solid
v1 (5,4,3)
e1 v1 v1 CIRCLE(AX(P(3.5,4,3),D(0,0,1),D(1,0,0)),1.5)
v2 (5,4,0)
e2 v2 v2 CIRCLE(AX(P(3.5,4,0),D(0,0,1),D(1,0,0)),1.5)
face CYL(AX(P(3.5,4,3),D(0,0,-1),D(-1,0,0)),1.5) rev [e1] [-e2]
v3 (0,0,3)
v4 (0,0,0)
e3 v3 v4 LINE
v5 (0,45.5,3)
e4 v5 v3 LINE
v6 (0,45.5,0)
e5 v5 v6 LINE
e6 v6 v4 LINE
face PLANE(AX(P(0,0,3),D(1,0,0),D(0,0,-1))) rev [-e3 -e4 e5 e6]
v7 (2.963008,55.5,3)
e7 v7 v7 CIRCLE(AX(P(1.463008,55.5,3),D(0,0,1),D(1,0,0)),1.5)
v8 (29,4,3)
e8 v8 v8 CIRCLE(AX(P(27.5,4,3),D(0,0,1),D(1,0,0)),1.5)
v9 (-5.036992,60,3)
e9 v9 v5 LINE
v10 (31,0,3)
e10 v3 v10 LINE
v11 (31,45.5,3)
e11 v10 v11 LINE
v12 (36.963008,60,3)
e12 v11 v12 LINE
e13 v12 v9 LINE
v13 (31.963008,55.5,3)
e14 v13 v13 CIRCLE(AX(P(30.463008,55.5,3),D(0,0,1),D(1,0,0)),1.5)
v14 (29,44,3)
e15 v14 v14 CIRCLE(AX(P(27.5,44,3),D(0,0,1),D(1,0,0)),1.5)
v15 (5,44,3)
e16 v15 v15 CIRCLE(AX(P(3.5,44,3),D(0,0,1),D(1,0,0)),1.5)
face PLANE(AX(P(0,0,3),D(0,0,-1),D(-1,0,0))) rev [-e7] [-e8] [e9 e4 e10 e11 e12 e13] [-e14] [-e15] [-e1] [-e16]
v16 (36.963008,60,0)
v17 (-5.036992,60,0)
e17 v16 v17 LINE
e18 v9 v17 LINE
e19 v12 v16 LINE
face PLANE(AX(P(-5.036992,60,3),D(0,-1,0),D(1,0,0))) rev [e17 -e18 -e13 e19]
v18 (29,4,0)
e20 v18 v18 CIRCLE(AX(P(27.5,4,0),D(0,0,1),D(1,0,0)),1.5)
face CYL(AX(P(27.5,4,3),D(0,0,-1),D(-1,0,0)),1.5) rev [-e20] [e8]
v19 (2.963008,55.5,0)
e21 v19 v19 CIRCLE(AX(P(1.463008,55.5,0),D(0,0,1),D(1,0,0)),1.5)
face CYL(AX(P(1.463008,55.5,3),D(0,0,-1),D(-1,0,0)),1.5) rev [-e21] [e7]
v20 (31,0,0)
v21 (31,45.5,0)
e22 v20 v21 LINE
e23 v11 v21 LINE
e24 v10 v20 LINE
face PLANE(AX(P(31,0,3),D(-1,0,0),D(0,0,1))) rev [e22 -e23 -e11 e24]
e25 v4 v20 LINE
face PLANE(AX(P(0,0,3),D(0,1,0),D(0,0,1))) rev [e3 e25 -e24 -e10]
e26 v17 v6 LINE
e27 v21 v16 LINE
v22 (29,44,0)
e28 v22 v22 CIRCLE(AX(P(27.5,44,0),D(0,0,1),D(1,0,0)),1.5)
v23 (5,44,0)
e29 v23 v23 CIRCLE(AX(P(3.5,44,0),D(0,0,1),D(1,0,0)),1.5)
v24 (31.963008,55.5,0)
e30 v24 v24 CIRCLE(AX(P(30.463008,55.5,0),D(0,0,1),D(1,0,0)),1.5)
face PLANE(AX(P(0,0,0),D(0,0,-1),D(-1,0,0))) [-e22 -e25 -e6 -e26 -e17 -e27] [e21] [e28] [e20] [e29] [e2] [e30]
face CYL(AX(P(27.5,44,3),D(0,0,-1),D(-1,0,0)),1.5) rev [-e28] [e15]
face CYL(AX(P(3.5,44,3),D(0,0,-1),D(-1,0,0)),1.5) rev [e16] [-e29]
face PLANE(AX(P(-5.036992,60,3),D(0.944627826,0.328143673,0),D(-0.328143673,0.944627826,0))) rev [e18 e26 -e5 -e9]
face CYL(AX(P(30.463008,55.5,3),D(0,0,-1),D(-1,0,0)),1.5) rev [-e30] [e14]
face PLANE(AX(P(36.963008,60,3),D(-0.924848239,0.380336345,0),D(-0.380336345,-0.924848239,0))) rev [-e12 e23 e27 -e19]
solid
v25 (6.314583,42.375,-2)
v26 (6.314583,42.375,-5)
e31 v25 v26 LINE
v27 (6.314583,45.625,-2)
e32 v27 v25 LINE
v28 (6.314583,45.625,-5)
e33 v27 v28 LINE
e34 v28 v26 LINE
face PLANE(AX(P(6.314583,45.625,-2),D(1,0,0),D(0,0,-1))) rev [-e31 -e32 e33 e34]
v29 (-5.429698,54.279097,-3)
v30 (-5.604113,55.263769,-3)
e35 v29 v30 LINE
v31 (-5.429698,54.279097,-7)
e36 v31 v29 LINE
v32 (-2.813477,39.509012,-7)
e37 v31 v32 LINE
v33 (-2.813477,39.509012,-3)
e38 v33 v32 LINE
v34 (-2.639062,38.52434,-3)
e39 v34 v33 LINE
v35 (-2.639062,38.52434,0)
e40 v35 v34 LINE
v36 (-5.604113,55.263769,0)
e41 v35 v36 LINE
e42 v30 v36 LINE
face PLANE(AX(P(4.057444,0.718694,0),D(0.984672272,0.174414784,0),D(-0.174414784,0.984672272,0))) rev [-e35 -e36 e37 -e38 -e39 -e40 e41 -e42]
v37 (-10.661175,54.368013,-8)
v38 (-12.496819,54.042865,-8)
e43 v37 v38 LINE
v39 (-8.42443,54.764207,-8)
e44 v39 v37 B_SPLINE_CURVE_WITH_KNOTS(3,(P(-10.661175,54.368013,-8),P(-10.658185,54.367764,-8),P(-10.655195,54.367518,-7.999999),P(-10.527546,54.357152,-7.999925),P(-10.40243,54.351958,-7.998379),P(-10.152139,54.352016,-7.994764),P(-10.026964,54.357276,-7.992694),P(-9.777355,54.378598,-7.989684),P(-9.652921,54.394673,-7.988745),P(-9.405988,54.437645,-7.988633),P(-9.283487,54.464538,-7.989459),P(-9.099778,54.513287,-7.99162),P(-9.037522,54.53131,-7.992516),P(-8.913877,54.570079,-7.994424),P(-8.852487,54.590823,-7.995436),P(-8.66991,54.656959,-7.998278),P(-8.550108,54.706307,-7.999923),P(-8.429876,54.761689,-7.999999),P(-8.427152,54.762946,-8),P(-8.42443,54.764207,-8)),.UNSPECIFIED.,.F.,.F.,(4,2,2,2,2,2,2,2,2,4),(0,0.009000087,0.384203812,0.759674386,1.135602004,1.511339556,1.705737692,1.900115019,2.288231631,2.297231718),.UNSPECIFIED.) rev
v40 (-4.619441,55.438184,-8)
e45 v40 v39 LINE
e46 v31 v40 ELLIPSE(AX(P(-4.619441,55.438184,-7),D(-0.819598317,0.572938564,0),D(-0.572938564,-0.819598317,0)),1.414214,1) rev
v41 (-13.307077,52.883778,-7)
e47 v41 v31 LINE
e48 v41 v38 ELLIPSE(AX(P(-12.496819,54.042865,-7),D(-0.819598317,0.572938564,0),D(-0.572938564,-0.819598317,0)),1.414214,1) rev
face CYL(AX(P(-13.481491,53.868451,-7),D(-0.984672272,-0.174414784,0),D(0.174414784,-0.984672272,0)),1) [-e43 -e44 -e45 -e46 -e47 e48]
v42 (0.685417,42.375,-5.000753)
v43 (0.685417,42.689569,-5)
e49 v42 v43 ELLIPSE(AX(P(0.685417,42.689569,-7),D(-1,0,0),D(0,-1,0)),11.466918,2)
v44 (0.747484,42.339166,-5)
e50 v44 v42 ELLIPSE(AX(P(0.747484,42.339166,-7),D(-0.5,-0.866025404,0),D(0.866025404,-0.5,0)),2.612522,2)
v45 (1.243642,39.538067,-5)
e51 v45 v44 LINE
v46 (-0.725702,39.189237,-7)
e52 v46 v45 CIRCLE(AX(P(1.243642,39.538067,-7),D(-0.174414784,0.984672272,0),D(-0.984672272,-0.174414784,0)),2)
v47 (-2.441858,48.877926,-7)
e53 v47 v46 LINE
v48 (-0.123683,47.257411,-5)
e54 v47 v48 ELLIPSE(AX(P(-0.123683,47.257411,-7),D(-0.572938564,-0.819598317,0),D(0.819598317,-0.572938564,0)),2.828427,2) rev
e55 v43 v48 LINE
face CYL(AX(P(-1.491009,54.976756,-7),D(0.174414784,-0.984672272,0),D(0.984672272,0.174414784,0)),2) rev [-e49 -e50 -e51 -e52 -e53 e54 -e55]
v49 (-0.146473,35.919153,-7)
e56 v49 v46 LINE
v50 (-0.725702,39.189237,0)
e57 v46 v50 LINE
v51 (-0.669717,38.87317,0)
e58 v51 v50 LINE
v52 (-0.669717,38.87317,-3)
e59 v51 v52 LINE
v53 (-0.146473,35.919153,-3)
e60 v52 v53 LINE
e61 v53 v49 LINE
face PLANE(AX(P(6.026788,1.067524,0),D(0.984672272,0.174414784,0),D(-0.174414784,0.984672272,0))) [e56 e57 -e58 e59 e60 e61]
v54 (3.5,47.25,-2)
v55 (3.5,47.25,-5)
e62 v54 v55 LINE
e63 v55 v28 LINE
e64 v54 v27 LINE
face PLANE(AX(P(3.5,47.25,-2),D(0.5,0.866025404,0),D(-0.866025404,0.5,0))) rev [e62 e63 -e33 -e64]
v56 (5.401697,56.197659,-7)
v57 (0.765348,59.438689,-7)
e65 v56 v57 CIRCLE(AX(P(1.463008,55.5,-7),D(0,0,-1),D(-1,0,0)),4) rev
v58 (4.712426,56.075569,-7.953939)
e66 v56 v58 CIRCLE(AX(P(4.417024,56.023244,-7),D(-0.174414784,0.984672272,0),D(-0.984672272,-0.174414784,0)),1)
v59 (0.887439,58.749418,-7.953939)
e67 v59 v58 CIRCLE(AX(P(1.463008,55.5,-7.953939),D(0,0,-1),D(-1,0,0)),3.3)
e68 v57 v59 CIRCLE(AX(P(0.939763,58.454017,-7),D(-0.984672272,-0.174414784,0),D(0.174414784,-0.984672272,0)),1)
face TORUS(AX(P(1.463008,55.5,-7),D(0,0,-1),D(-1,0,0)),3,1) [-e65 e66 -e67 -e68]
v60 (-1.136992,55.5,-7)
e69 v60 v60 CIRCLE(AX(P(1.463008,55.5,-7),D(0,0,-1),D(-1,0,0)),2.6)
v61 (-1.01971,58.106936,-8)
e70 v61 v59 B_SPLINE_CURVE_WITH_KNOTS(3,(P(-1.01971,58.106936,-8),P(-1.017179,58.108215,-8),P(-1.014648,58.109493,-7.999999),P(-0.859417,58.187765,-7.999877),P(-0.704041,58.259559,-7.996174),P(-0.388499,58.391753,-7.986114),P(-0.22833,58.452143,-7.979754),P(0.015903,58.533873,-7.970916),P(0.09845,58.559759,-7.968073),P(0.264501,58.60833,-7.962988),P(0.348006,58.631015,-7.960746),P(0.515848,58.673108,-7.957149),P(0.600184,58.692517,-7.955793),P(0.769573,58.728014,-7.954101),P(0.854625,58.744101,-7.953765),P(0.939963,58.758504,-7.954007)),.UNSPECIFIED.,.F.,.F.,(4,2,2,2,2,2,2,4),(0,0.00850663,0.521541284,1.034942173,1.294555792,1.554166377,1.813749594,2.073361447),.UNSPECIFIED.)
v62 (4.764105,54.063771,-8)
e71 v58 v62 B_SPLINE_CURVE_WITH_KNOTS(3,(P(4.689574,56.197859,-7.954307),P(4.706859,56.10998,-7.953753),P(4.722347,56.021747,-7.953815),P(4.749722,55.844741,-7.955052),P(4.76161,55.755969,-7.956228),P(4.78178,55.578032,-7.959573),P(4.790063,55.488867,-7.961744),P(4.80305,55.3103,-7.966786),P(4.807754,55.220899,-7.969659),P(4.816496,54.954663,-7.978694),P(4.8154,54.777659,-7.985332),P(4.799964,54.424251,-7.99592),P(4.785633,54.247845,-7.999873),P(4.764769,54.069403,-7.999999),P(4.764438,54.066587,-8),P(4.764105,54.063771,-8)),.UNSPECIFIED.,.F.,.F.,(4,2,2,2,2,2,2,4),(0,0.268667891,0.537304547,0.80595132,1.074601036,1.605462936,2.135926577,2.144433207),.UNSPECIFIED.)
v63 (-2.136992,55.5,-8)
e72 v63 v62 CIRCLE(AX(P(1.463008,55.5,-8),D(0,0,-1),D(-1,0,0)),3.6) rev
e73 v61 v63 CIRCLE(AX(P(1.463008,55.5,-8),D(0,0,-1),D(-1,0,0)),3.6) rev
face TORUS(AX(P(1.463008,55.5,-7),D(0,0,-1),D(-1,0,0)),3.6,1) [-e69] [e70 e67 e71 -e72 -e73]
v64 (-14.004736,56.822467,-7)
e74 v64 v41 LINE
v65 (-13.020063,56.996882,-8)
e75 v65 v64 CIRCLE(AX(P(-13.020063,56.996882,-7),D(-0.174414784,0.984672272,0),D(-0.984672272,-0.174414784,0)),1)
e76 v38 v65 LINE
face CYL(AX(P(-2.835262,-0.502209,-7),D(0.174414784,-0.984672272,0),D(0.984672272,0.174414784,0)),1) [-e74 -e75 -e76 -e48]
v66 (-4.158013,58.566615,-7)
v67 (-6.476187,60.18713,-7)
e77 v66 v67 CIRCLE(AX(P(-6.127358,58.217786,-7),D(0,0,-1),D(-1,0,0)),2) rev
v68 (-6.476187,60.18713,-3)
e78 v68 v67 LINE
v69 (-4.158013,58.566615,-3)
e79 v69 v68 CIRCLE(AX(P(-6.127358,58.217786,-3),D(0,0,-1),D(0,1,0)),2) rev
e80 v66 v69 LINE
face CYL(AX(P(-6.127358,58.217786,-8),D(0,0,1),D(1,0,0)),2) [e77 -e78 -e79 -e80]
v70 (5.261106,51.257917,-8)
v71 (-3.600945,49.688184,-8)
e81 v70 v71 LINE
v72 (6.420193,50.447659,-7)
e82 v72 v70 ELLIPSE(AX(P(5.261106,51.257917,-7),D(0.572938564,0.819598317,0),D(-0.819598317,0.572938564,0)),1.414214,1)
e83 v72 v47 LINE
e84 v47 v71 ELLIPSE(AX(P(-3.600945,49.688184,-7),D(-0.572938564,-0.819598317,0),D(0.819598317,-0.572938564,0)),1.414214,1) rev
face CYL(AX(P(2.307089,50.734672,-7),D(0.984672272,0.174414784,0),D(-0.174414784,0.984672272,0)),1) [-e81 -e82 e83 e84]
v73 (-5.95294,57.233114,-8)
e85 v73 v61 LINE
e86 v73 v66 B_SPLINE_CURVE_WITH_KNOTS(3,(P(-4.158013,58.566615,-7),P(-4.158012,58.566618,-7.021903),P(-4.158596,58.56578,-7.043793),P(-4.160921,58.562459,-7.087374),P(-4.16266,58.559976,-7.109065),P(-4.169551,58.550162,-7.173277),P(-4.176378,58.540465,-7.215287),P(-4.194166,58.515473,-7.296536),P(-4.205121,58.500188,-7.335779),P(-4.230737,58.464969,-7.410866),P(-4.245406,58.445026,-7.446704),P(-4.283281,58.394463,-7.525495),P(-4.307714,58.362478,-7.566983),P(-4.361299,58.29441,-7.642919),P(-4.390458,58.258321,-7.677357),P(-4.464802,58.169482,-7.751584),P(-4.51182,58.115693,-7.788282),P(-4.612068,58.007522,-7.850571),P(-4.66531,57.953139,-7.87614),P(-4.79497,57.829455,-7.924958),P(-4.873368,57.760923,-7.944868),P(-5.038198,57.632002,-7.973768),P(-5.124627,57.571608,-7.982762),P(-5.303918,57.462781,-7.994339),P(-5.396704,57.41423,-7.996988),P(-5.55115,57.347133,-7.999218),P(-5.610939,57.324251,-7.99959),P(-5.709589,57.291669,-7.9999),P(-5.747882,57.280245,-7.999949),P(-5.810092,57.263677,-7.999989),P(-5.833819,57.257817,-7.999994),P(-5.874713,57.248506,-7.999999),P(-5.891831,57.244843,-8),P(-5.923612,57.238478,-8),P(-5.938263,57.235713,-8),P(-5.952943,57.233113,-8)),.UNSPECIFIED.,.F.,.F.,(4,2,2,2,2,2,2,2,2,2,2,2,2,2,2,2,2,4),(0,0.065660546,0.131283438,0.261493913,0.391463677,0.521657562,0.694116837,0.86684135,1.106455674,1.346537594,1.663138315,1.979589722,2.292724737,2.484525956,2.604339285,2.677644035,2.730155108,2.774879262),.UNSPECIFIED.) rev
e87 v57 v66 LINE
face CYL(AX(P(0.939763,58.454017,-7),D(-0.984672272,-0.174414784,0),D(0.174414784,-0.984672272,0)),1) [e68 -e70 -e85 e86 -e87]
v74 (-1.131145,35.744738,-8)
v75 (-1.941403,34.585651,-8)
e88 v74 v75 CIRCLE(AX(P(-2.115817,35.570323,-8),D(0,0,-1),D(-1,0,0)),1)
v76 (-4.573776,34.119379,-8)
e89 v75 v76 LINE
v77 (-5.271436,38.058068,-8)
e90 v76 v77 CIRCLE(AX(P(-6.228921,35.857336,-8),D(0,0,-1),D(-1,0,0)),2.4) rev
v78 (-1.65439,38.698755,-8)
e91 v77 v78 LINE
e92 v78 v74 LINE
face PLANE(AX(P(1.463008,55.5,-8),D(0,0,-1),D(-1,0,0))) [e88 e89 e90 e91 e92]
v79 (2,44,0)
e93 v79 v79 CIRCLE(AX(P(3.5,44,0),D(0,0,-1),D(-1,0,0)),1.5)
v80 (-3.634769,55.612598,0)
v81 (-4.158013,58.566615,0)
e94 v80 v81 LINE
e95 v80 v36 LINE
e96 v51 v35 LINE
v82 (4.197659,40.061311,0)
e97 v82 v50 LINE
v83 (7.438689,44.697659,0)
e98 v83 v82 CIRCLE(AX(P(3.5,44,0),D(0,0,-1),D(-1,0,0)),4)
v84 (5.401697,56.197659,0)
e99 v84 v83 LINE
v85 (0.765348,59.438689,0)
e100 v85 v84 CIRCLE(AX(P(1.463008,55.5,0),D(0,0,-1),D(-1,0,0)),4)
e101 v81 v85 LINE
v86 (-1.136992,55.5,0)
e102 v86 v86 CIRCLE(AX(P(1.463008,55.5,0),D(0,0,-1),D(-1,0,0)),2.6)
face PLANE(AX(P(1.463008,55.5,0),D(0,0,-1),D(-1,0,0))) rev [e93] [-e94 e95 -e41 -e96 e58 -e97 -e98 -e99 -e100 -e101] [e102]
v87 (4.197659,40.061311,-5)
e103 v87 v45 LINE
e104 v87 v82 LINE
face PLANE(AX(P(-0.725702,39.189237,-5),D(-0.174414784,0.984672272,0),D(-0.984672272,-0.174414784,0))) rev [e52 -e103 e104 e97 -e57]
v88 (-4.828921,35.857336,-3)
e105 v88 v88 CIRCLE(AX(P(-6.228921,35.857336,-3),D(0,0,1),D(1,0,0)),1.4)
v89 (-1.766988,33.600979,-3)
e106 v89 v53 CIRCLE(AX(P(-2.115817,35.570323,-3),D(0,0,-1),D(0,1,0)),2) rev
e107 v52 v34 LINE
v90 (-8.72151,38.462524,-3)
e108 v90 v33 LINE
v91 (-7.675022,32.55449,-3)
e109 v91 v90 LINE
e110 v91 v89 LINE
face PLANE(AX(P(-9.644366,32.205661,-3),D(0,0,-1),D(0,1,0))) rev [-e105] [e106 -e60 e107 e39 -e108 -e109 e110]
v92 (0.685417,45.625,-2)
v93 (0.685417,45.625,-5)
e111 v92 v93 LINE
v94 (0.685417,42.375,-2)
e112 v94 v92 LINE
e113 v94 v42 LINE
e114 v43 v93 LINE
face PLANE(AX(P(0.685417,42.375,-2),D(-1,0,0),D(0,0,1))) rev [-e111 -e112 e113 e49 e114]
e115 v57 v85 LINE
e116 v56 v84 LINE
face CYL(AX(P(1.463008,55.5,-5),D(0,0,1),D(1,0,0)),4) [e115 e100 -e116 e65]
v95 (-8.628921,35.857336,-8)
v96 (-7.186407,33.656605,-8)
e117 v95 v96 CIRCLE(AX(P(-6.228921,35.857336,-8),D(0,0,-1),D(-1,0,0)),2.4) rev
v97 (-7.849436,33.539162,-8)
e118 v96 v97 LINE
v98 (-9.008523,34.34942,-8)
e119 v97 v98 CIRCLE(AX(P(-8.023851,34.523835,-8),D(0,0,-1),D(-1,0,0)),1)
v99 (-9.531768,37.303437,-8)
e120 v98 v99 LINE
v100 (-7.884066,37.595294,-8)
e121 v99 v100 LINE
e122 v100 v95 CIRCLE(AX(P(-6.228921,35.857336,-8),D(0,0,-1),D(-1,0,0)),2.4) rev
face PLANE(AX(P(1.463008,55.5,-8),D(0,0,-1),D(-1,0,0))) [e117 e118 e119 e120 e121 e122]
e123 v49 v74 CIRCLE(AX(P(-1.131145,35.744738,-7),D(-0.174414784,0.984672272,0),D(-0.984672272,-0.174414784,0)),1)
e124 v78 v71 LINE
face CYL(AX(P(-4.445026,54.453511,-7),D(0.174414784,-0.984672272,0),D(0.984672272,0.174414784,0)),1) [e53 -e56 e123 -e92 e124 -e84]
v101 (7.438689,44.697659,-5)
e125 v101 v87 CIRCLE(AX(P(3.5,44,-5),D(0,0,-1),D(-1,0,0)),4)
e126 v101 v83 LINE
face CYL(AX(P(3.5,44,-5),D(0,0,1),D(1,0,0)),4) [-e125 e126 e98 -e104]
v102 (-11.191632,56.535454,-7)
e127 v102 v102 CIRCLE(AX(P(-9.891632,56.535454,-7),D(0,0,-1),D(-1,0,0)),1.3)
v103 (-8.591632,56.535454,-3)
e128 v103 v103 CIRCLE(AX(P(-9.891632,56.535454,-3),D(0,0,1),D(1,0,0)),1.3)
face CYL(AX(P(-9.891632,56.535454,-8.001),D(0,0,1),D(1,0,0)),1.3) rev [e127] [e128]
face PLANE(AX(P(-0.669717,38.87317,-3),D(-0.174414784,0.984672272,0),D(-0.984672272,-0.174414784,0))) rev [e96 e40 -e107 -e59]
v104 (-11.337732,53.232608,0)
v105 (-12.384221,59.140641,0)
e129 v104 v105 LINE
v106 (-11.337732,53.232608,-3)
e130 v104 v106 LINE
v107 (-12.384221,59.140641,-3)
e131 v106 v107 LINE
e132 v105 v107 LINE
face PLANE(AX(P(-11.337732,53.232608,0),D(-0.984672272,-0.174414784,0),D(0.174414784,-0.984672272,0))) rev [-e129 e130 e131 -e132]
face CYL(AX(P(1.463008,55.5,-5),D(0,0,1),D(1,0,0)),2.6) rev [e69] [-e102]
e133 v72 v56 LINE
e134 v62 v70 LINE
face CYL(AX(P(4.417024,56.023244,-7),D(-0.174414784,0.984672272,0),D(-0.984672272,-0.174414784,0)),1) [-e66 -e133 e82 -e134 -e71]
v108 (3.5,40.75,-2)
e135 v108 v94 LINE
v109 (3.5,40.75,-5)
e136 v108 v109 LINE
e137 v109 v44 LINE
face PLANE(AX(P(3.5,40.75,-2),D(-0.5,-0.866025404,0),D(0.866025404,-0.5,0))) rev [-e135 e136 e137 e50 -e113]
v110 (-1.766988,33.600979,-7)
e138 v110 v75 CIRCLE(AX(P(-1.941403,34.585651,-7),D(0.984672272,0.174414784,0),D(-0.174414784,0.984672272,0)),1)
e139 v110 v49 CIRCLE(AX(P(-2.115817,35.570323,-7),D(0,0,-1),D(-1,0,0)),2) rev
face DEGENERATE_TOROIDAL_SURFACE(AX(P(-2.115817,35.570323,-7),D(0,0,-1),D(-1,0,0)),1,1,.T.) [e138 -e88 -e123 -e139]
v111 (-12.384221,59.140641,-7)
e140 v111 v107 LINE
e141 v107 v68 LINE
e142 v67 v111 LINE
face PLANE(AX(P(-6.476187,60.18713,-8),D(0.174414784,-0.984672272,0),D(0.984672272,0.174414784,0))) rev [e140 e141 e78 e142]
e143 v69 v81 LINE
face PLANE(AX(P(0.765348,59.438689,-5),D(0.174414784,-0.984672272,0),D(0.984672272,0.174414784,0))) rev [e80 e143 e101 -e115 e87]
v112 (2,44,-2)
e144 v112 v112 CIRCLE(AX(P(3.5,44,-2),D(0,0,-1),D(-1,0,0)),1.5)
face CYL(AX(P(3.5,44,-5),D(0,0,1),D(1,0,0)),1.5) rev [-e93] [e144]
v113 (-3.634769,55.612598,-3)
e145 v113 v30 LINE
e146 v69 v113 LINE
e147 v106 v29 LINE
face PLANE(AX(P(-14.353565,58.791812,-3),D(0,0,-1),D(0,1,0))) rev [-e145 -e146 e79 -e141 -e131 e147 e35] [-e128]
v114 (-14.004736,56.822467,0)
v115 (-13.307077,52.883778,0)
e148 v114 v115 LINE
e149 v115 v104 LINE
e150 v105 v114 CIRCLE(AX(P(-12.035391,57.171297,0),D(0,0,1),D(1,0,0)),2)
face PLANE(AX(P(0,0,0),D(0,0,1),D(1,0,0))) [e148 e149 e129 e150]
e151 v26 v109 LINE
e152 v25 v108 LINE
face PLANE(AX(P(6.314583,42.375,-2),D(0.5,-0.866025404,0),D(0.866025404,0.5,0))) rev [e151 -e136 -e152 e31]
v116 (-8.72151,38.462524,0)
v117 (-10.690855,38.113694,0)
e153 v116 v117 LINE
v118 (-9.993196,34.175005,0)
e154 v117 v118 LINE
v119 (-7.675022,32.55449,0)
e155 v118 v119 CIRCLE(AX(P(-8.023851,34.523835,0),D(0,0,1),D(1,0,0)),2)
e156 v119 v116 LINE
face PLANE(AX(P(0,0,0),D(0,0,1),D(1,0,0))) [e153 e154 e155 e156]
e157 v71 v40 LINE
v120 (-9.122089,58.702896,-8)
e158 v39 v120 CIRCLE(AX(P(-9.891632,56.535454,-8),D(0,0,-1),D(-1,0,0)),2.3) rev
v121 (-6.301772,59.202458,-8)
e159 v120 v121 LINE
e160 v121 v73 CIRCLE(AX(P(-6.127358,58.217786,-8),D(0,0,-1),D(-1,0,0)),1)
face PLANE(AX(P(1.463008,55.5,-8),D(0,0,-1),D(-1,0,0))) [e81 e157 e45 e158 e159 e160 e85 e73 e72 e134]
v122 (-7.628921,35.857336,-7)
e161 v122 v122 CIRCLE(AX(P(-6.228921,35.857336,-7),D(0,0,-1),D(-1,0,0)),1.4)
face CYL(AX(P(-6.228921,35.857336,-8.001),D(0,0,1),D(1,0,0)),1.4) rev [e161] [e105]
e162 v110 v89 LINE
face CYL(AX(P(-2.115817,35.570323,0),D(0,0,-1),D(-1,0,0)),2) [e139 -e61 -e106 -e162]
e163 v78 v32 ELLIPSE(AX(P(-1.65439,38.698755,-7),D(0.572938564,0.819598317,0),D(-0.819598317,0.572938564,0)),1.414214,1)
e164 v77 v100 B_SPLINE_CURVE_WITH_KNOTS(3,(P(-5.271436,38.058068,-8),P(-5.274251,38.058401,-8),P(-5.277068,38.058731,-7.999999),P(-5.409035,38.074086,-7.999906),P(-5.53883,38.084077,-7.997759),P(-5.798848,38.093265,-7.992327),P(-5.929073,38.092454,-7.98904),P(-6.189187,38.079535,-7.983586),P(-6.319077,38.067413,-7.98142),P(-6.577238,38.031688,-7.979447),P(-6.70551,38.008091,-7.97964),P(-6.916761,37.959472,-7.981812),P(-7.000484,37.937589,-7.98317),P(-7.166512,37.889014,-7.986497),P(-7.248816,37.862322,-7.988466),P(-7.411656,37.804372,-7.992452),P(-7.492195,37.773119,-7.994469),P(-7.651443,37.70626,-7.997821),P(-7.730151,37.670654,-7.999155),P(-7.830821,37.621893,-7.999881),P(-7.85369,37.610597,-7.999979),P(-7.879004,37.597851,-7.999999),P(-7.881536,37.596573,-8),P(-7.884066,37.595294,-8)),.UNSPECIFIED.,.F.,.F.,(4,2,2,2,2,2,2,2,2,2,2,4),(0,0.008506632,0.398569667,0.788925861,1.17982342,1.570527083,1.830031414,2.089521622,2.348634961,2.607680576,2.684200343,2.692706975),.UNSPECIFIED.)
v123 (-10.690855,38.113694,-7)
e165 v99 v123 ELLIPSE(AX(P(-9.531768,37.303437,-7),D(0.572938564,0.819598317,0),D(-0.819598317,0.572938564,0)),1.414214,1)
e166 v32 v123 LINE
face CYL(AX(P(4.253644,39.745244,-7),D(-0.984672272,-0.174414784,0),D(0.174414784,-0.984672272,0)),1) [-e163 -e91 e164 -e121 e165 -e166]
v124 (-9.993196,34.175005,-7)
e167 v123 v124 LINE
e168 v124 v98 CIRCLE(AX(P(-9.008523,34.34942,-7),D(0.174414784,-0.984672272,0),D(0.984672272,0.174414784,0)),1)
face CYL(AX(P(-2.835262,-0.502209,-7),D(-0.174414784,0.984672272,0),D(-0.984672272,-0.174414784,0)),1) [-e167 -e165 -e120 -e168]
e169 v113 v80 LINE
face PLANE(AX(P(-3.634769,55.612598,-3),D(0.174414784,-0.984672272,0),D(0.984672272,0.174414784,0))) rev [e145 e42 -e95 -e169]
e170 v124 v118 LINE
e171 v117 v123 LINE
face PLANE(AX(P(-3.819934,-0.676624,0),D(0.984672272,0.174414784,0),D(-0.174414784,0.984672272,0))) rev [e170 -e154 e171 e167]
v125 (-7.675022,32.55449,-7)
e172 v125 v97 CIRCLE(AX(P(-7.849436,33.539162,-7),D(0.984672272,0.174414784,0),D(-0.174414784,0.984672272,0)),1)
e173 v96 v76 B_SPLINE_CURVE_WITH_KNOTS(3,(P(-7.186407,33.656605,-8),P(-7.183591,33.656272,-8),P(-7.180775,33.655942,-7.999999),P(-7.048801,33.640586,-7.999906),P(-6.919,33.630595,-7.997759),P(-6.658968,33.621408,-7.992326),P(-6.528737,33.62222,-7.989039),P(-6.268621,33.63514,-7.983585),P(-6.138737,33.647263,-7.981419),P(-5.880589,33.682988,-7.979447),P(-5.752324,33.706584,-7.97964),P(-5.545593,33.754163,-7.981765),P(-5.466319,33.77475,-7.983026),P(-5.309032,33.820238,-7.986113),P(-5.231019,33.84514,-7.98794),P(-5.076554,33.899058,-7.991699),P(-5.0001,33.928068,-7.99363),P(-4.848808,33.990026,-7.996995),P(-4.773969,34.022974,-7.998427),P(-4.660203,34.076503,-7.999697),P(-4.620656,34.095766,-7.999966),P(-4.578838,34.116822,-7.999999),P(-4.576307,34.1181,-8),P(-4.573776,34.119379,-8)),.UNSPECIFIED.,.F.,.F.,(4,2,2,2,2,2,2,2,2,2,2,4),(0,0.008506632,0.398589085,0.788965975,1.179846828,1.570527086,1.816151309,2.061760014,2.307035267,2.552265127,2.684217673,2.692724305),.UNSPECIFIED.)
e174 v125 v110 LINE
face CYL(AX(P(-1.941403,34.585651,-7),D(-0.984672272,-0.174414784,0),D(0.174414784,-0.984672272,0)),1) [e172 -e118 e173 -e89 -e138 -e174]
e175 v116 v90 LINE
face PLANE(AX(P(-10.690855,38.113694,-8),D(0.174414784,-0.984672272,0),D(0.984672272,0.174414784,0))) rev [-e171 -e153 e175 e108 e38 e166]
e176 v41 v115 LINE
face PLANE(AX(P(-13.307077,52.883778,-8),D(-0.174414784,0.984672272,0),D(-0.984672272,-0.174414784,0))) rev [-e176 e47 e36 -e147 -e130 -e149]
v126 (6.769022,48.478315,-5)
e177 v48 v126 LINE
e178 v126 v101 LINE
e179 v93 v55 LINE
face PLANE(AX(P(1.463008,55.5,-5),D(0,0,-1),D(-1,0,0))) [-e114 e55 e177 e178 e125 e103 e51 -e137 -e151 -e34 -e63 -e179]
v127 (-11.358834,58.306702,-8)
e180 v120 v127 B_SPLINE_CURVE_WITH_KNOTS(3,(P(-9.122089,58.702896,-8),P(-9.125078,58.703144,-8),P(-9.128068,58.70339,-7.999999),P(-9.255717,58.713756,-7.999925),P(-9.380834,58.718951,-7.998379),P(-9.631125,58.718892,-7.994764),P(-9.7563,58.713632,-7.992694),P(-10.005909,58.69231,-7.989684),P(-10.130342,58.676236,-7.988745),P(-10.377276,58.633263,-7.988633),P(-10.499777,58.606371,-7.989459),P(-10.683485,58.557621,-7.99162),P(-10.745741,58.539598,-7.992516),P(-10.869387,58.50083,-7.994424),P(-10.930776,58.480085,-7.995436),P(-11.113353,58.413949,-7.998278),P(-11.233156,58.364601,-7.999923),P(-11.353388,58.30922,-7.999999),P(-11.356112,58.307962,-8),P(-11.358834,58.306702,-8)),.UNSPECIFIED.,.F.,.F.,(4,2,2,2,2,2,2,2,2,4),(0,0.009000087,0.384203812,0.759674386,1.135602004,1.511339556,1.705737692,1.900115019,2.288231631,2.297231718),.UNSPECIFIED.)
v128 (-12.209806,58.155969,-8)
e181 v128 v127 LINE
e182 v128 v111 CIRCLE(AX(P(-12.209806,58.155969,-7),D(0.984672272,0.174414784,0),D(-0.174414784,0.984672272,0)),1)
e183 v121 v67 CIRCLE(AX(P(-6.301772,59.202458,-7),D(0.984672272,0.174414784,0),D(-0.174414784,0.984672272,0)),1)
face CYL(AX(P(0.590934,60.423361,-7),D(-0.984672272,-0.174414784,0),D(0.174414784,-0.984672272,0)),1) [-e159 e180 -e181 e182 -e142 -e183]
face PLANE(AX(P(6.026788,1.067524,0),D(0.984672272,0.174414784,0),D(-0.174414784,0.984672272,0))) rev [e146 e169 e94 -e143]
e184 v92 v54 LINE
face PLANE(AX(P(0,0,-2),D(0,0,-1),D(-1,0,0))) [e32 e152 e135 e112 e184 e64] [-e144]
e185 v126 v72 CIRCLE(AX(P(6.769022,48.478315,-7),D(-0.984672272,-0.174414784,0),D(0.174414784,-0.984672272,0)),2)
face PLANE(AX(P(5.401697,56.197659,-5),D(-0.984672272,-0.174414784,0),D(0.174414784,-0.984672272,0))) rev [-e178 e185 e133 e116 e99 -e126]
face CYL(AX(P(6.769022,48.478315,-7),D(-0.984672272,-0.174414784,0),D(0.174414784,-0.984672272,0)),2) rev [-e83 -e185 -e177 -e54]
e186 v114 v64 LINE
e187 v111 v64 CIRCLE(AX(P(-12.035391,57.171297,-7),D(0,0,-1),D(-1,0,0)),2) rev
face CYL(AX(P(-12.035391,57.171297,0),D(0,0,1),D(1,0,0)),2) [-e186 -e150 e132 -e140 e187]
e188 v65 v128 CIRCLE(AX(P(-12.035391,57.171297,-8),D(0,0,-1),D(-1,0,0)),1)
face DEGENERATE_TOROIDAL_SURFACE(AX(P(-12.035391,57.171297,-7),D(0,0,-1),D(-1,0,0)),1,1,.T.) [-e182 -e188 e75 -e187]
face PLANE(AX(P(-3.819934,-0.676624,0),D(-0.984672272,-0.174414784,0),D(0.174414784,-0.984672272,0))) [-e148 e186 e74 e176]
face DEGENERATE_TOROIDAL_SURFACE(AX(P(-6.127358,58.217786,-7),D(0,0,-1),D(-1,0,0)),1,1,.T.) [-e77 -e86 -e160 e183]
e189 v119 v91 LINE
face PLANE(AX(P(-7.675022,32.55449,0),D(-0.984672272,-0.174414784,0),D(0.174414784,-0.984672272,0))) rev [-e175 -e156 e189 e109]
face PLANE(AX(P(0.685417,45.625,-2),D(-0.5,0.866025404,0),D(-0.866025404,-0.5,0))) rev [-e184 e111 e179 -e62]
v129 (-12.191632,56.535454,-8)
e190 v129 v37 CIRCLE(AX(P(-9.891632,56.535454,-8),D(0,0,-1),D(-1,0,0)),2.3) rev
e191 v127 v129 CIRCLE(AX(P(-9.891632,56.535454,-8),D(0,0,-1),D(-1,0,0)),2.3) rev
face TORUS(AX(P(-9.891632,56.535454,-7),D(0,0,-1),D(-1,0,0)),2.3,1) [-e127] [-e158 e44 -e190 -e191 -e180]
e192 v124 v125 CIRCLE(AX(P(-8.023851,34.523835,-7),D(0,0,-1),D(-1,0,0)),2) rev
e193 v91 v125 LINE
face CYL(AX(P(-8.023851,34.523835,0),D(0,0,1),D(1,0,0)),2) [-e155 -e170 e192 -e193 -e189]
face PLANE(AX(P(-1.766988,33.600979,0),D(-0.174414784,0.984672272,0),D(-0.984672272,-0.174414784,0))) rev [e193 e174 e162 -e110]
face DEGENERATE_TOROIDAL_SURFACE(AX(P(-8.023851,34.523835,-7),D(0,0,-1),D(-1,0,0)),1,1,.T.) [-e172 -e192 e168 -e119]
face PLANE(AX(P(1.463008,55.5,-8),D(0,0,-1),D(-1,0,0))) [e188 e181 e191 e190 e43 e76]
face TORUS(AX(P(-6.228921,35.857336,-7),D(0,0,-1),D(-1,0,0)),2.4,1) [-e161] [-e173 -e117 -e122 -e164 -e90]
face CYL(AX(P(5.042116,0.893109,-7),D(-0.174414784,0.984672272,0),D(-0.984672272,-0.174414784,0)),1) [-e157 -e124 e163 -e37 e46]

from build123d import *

# Parameters (mm, degrees)
SKETCH1_R           = 1.5
BOSS_EXTRUDE1_DEPTH = 3
SKETCH3_R           = 2.6
SKETCH3_R_2         = 1.5
BOSS_EXTRUDE2_DEPTH = 5
SKETCH6_R           = 2.6
BOSS_EXTRUDE5_DEPTH = 3
CUT_EXTRUDE1_DEPTH  = 3
SKETCH4_W           = 8
SKETCH4_H           = 27
BOSS_EXTRUDE7_DEPTH = 2
SKETCH9_W           = 5
SKETCH9_H           = 6
BOSS_EXTRUDE8_DEPTH = 8
SKETCH10_W          = 3
SKETCH10_H          = 5
CUT_EXTRUDE2_DEPTH  = 2
SKETCH11_R          = 1.4
SKETCH11_R_2        = 1.3
CUT_EXTRUDE3_DEPTH  = 5
BOSS_EXTRUDE9_DEPTH = 3
FILLET1_R           = 2
FILLET2_R           = 1


with BuildPart() as part:
    # Sketch1 → Boss-Extrude1 (new body)
    with BuildSketch(Plane.XY):
        Polygon((0, 0), (31, 0), (31, 45.5), (36.963007518, 60), (-5.036992482, 60), (0, 45.5), align=None)
        with Locations((30.463007518, 55.5)):
            Circle(SKETCH1_R, mode=Mode.SUBTRACT)
        with Locations((27.5, 44)):
            Circle(SKETCH1_R, mode=Mode.SUBTRACT)
        with Locations((27.5, 4)):
            Circle(SKETCH1_R, mode=Mode.SUBTRACT)
        with Locations((3.5, 4)):
            Circle(SKETCH1_R, mode=Mode.SUBTRACT)
        with Locations((3.5, 44)):
            Circle(SKETCH1_R, mode=Mode.SUBTRACT)
        with Locations((1.463007518, 55.5)):
            Circle(SKETCH1_R, mode=Mode.SUBTRACT)
    extrude(amount=BOSS_EXTRUDE1_DEPTH)


with BuildPart() as body_2:
    # Sketch3 → Boss-Extrude2 (new body)
    with BuildSketch(Plane(origin=(0, 0, 0), x_dir=(-1, 0, 0), z_dir=(0, 0, -1))):
        with BuildLine():
            Line((-5.401696606, 56.197659136), (-7.438689088, 44.697659136))
            ThreePointArc((-7.438689088, 44.697659136), (-6.778393269, 41.708245743), (-4.197659136, 40.061310912))
            Line((-4.197659136, 40.061310912), (0.725702224, 39.189236993))
            Line((0.725702224, 39.189236993), (4.158012977, 58.566615168))
            Line((4.158012977, 58.566615168), (-0.765348382, 59.438689088))
            ThreePointArc((-0.765348382, 59.438689088), (-3.754761775, 58.778393269), (-5.401696606, 56.197659136))
        make_face()
        with Locations((-1.463007518, 55.5)):
            Circle(SKETCH3_R, mode=Mode.SUBTRACT)
        with Locations((-3.5, 44)):
            Circle(SKETCH3_R_2, mode=Mode.SUBTRACT)
    extrude(amount=BOSS_EXTRUDE2_DEPTH)

    # Sketch6 → Boss-Extrude5 (add)
    with BuildSketch(Plane(origin=(0, 0, -5), x_dir=(-1, 0, 0), z_dir=(0, 0, -1))):
        with BuildLine():
            Line((-6.420192847, 50.447659136), (2.441857601, 48.87792608))
            Line((2.441857601, 48.87792608), (4.158012977, 58.566615168))
            Line((4.158012977, 58.566615168), (-0.765348382, 59.438689088))
            ThreePointArc((-0.765348382, 59.438689088), (-3.754761775, 58.778393269), (-5.401696606, 56.197659136))
            Line((-5.401696606, 56.197659136), (-6.420192847, 50.447659136))
        make_face()
        with Locations((-1.463007518, 55.5)):
            Circle(SKETCH6_R, mode=Mode.SUBTRACT)
    extrude(amount=BOSS_EXTRUDE5_DEPTH)

    # Sketch8 → Cut-Extrude1 (cut)
    with BuildSketch(Plane(origin=(0, 0, -5), x_dir=(-1, 0, 0), z_dir=(0, 0, -1))):
        Polygon((-3.5, 40.75), (-0.685417438, 42.375), (-0.685417438, 45.625), (-3.5, 47.25), (-6.314582562, 45.625), (-6.314582562, 42.375), align=None)
    extrude(amount=-CUT_EXTRUDE1_DEPTH, mode=Mode.SUBTRACT)

    # Sketch4 → Boss-Extrude7 (add)
    with BuildSketch(Plane(origin=(6.026788499, 1.067523727, 0), x_dir=(0, 0, 1), z_dir=(-0.9846722719514623, -0.17441478392024493, 0))):
        with Locations((-4, 46.894140953)):
            Rectangle(SKETCH4_W, SKETCH4_H)
    extrude(amount=BOSS_EXTRUDE7_DEPTH)

    # Sketch9 → Boss-Extrude8 (add)
    with BuildSketch(Plane(origin=(4.057443955, 0.718694159, 0), x_dir=(0, 0, 1), z_dir=(-0.9846722719514623, -0.17441478392024487, 0))):
        with Locations((-5.5, 57.394140953)):
            Rectangle(SKETCH9_W, SKETCH9_H)
        with Locations((-5.5, 36.394140953)):
            Rectangle(SKETCH9_W, SKETCH9_H)
    extrude(amount=BOSS_EXTRUDE8_DEPTH)

    # Sketch10 → Cut-Extrude2 (cut)
    with BuildSketch(Plane(origin=(4.057443955, 0.718694159, 0), x_dir=(0, 0, 1), z_dir=(-0.9846722719514623, -0.17441478392024487, 0))):
        with Locations((-1.5, 57.894140953)):
            Rectangle(SKETCH10_W, SKETCH10_H)
        with Locations((-1.5, 35.894140953)):
            Rectangle(SKETCH10_W, SKETCH10_H)
    extrude(amount=-CUT_EXTRUDE2_DEPTH, mode=Mode.SUBTRACT)

    # Sketch11 → Cut-Extrude3 (cut)
    with BuildSketch(Plane.XY.offset(-3)):
        with Locations((-6.228921363, 35.857336482)):
            Circle(SKETCH11_R)
        with Locations((-9.891631825, 56.535454193)):
            Circle(SKETCH11_R_2)
    extrude(amount=-CUT_EXTRUDE3_DEPTH, mode=Mode.SUBTRACT)

    # Sketch12 → Boss-Extrude9 (add)
    with BuildSketch(Plane.XY.offset(-3)):
        Polygon((-10.690854802, 38.113694162), (-9.644366099, 32.20566053), (-7.675021555, 32.554490098), (-8.721510258, 38.46252373), align=None)
        Polygon((-14.353565265, 58.791811873), (-13.307076561, 52.883778241), (-11.337732017, 53.232607809), (-12.384220721, 59.140641441), align=None)
    extrude(amount=BOSS_EXTRUDE9_DEPTH)

    # Fillet1
    # the kernel refuses this fillet: 2 mm, written as the material it adds along each edge
    with BuildSketch(Plane(origin=(-0.725702224, 39.189236993, -5), x_dir=(0.9846722719514622, 0.1744147839202449, 0), z_dir=(-0.1744147839202449, 0.9846722719514622, 0))) as fillet1_piece_1_section:
        with BuildLine():
            CenterArc((FILLET1_R, FILLET1_R), FILLET1_R, 180, 90)
            Line((0, FILLET1_R), (0, 0))
            Line((0, 0), (FILLET1_R, 0))
        make_face()
    fillet1_piece_1 = extrude(amount=14.839506366, mode=Mode.PRIVATE)
    fillet1_piece_1 = split(fillet1_piece_1, bisect_by=Plane(origin=(1.750934761, 41.759823287, -5.016294478), z_dir=(-0.49999999999999994, -0.8660254037844387, 0)), keep=Keep.TOP, mode=Mode.PRIVATE)
    add(fillet1_piece_1)
    with BuildSketch(Plane(origin=(-0.725702224, 39.189236993, -5), x_dir=(0.9846722719514622, 0.1744147839202449, 0), z_dir=(-0.1744147839202449, 0.9846722719514622, 0))) as fillet1_piece_2_section:
        with BuildLine():
            CenterArc((FILLET1_R, FILLET1_R), FILLET1_R, 180, 90)
            Line((0, FILLET1_R), (0, 0))
            Line((0, 0), (FILLET1_R, 0))
        make_face()
    fillet1_piece_2 = extrude(amount=14.839506366, mode=Mode.PRIVATE)
    fillet1_piece_2 = split(fillet1_piece_2, bisect_by=Plane(origin=(0.685417438, 46.149775088, -5.43451479), z_dir=(-1, 0, 0)), keep=Keep.TOP, mode=Mode.PRIVATE)
    add(fillet1_piece_2)
    with BuildSketch(Plane(origin=(6.420192847, 50.447659136, -5), x_dir=(0.1744147839202439, -0.9846722719514623, 0), z_dir=(-0.9846722719514623, -0.17441478392024387, 0))) as fillet1_piece_3:
        with BuildLine():
            CenterArc((FILLET1_R, -FILLET1_R), FILLET1_R, 90, 90)
            Line((0, -FILLET1_R), (0, 0))
            Line((0, 0), (FILLET1_R, 0))
        make_face()
    extrude(amount=9)
    # the kernel refuses this fillet: 2 mm, written as the material it takes off along each edge
    with BuildSketch(Plane(origin=(-4.506842545, 60.535959712, -13), x_dir=(0.17441478392024556, -0.9846722719514621, 0), z_dir=(0, 0, 1))) as fillet1_2_piece_1:
        with BuildLine():
            CenterArc((FILLET1_R, -FILLET1_R), FILLET1_R, 90, 90)
            Line((0, -FILLET1_R), (0, 0))
            Line((0, 0), (FILLET1_R, 0))
        make_face()
    extrude(amount=15, mode=Mode.SUBTRACT)
    with BuildSketch(Plane(origin=(0.202356621, 33.949808369, 2), x_dir=(-0.9846722719514622, -0.17441478392024462, 0), z_dir=(0, 0, -1))) as fillet1_2_piece_2:
        with BuildLine():
            CenterArc((FILLET1_R, FILLET1_R), FILLET1_R, 180, 90)
            Line((0, FILLET1_R), (0, 0))
            Line((0, 0), (FILLET1_R, 0))
        make_face()
    extrude(amount=15, mode=Mode.SUBTRACT)
    with BuildSketch(Plane(origin=(-14.353565265, 58.791811873, -13), x_dir=(0.9846722719514622, 0.17441478392024498, 0), z_dir=(0, 0, 1))) as fillet1_2_piece_3:
        with BuildLine():
            CenterArc((FILLET1_R, -FILLET1_R), FILLET1_R, 90, 90)
            Line((0, -FILLET1_R), (0, 0))
            Line((0, 0), (FILLET1_R, 0))
        make_face()
    extrude(amount=18, mode=Mode.SUBTRACT)
    with BuildSketch(Plane(origin=(-9.644366099, 32.20566053, 5), x_dir=(-0.1744147839202448, 0.9846722719514623, 0), z_dir=(0, 0, -1))) as fillet1_2_piece_4:
        with BuildLine():
            CenterArc((FILLET1_R, FILLET1_R), FILLET1_R, 180, 90)
            Line((0, FILLET1_R), (0, 0))
            Line((0, 0), (FILLET1_R, 0))
        make_face()
    extrude(amount=18, mode=Mode.SUBTRACT)

    # Fillet2
    # the kernel refuses this fillet: 1 mm, written as the material it takes off along each edge
    with BuildSketch(Plane(origin=(1.463007518, 55.5, -8), x_dir=(-0.17441478392024487, 0.9846722719514622, 0), z_dir=(-0.9846722719514622, -0.17441478392024487, 0))) as fillet2_piece_1:
        with BuildLine():
            CenterArc((4 - FILLET2_R, -FILLET2_R), FILLET2_R, 0, 90)
            Line((4, -FILLET2_R), (4, 0))
            Line((4, 0), (4 - FILLET2_R, 0))
        make_face()
    revolve(axis=Axis((1.463007518, 55.5, -8), (0, 0, -1)), revolution_arc=90, mode=Mode.SUBTRACT)
    with BuildSketch(Plane(origin=(-6.619693657, 58.130578208, -8), x_dir=(0.17441478392024404, -0.9846722719514623, 0), z_dir=(0.9846722719514623, 0.17441478392024404, 0))) as fillet2_piece_2_section:
        with BuildLine():
            CenterArc((FILLET2_R, -FILLET2_R), FILLET2_R, 90, 90)
            Line((0, -FILLET2_R), (0, 0))
            Line((0, 0), (FILLET2_R, 0))
        make_face()
    fillet2_piece_2 = extrude(amount=7.5, mode=Mode.PRIVATE)
    fillet2_piece_2 = fillet2_piece_2 - Plane(origin=(-6.127357521, 58.2177856, -7.77443348), x_dir=(0.17441478392008683, -0.9846722719514902, 0), z_dir=(0, 0, -1)) * Cylinder(2, 19, mode=Mode.PRIVATE)
    add(fillet2_piece_2, mode=Mode.SUBTRACT)
    with BuildSketch(Plane(origin=(-0.146472947, 35.919152913, -8), x_dir=(-0.9846722719514621, -0.1744147839202449, 0), z_dir=(-0.1744147839202449, 0.9846722719514621, 0))) as fillet2_piece_3:
        with BuildLine():
            CenterArc((FILLET2_R, FILLET2_R), FILLET2_R, 180, 90)
            Line((0, FILLET2_R), (0, 0))
            Line((0, 0), (FILLET2_R, 0))
        make_face()
    extrude(amount=13.160493634, mode=Mode.SUBTRACT)
    with BuildSketch(Plane(origin=(-6.476187089, 60.187130144, -8), x_dir=(0.1744147839202434, -0.9846722719514625, 0), z_dir=(-0.9846722719514625, -0.1744147839202434, 0)), Plane(origin=(-7.675021555, 32.554490098, -8), x_dir=(-0.1744147839202434, 0.9846722719514625, 0), z_dir=(0.9846722719514625, 0.1744147839202434, 0))) as fillet2_piece_4:
        with BuildLine():
            CenterArc((FILLET2_R, FILLET2_R), FILLET2_R, 180, 90)
            Line((0, FILLET2_R), (0, 0))
            Line((0, 0), (FILLET2_R, 0))
        make_face()
    extrude(amount=6, mode=Mode.SUBTRACT)
    with BuildSketch(Plane(origin=(-2.813476627, 39.509012433, -8), x_dir=(0.9846722719514622, 0.17441478392024493, 0), z_dir=(-0.1744147839202449, 0.9846722719514621, 0))) as fillet2_piece_5:
        with BuildLine():
            CenterArc((FILLET2_R, -FILLET2_R), FILLET2_R, 90, 90)
            Line((0, -FILLET2_R), (0, 0))
            Line((0, 0), (FILLET2_R, 0))
        make_face()
    extrude(amount=15, mode=Mode.SUBTRACT)
    with BuildSketch(Plane(origin=(-12.871039601, 50.422097561, -8), x_dir=(0.9846722719514622, 0.17441478392024487, 0), z_dir=(-0.17441478392024487, 0.9846722719514623, 0))) as fillet2_piece_6:
        with BuildLine():
            CenterArc((FILLET2_R, -FILLET2_R), FILLET2_R, 90, 90)
            Line((0, -FILLET2_R), (0, 0))
            Line((0, 0), (FILLET2_R, 0))
        make_face()
    extrude(amount=6.5, mode=Mode.SUBTRACT)
    with BuildSketch(Plane(origin=(-5.429698386, 54.279096513, -8), x_dir=(-0.17441478392024484, 0.9846722719514622, 0), z_dir=(-0.9846722719514623, -0.17441478392024487, 0))) as fillet2_piece_7:
        with BuildLine():
            CenterArc((FILLET2_R, -FILLET2_R), FILLET2_R, 90, 90)
            Line((0, -FILLET2_R), (0, 0))
            Line((0, 0), (FILLET2_R, 0))
        make_face()
    extrude(amount=10.5, mode=Mode.SUBTRACT)
    with BuildSketch(Plane(origin=(-2.813476627, 39.509012433, -8), x_dir=(0.17441478392024484, -0.9846722719514622, 0), z_dir=(-0.9846722719514623, -0.17441478392024487, 0))) as fillet2_piece_8:
        with BuildLine():
            CenterArc((FILLET2_R, FILLET2_R), FILLET2_R, 180, 90)
            Line((0, FILLET2_R), (0, 0))
            Line((0, 0), (FILLET2_R, 0))
        make_face()
    extrude(amount=10.5, mode=Mode.SUBTRACT)
    with BuildSketch(Plane(origin=(-11.126891762, 40.575374842, -8), x_dir=(0.9846722719514622, 0.17441478392024487, 0), z_dir=(0.17441478392024487, -0.9846722719514623, 0))) as fillet2_piece_9:
        with BuildLine():
            CenterArc((FILLET2_R, FILLET2_R), FILLET2_R, 180, 90)
            Line((0, FILLET2_R), (0, 0))
            Line((0, 0), (FILLET2_R, 0))
        make_face()
    extrude(amount=6.5, mode=Mode.SUBTRACT)
    with BuildSketch(Plane(origin=(8.881873527, 50.883696095, -8), x_dir=(0, 0, 1), z_dir=(-0.9846722719514623, -0.17441478392024387, 0))) as fillet2_piece_10:
        with BuildLine():
            CenterArc((FILLET2_R, FILLET2_R), FILLET2_R, 180, 90)
            Line((0, FILLET2_R), (0, 0))
            Line((0, 0), (FILLET2_R, 0))
        make_face()
    extrude(amount=11.5, mode=Mode.SUBTRACT)
    with BuildSketch(Plane(origin=(5.401696606, 56.197659136, -8), x_dir=(1.0801180343414839e-12, 1.913210709129383e-13, 1.0), z_dir=(0.1744147839202451, -0.9846722719514622, 0))) as fillet2_piece_11:
        with BuildLine():
            CenterArc((FILLET2_R, FILLET2_R), FILLET2_R, 180, 90)
            Line((0, FILLET2_R), (0, 0))
            Line((0, 0), (FILLET2_R, 0))
        make_face()
    extrude(amount=8.339506366, mode=Mode.SUBTRACT)
    with BuildSketch(Plane(origin=(-12.035391153, 57.171296897, -8), x_dir=(-0.9846722719514899, -0.17441478392008852, 0), z_dir=(0.17441478392008852, -0.9846722719514899, 0))) as fillet2_piece_12:
        with BuildLine():
            CenterArc((2 - FILLET2_R, -FILLET2_R), FILLET2_R, 0, 90)
            Line((2, -FILLET2_R), (2, 0))
            Line((2, 0), (2 - FILLET2_R, 0))
        make_face()
    revolve(axis=Axis((-12.035391153, 57.171296897, -8), (0, 0, -1)), revolution_arc=90, mode=Mode.SUBTRACT)
    with BuildSketch(Plane(origin=(-8.023851123, 34.523834642, -8), x_dir=(-0.98467227195149, -0.17441478392008838, 0), z_dir=(-0.17441478392008838, 0.98467227195149, 0))) as fillet2_piece_13:
        with BuildLine():
            CenterArc((2 - FILLET2_R, FILLET2_R), FILLET2_R, 270, 90)
            Line((2, FILLET2_R), (2, 0))
            Line((2, 0), (2 - FILLET2_R, 0))
        make_face()
    revolve(axis=Axis((-8.023851123, 34.523834642, -8), (0, 0, 1)), revolution_arc=90, mode=Mode.SUBTRACT)
    with BuildSketch(Plane(origin=(-2.115817491, 35.570323345, -8), x_dir=(0.1744147839200875, -0.9846722719514901, 0), z_dir=(-0.9846722719514901, -0.1744147839200875, 0))) as fillet2_piece_14:
        with BuildLine():
            CenterArc((2 - FILLET2_R, FILLET2_R), FILLET2_R, 270, 90)
            Line((2, FILLET2_R), (2, 0))
            Line((2, 0), (2 - FILLET2_R, 0))
        make_face()
    revolve(axis=Axis((-2.115817491, 35.570323345, -8), (0, 0, 1)), revolution_arc=90, mode=Mode.SUBTRACT)
    with BuildSketch(Plane(origin=(-6.127357521, 58.2177856, -8), x_dir=(-0.17441478392008739, 0.9846722719514901, 0), z_dir=(-0.9846722719514901, -0.17441478392008739, 0))) as fillet2_piece_15:
        with BuildLine():
            CenterArc((2 - FILLET2_R, -FILLET2_R), FILLET2_R, 0, 90)
            Line((2, -FILLET2_R), (2, 0))
            Line((2, 0), (2 - FILLET2_R, 0))
        make_face()
    revolve(axis=Axis((-6.127357521, 58.2177856, -8), (0, 0, -1)), revolution_arc=90, mode=Mode.SUBTRACT)
    with BuildSketch(Plane(origin=(1.463007518, 55.5, -8), x_dir=(-1, 0, 0), z_dir=(0, -1, 0))) as fillet2_piece_16:
        with BuildLine():
            CenterArc((2.6 + FILLET2_R, -FILLET2_R), FILLET2_R, 90, 90)
            Line((2.6, -FILLET2_R), (2.6, 0))
            Line((2.6, 0), (2.6 + FILLET2_R, 0))
        make_face()
    revolve(axis=Axis((1.463007518, 55.5, -8), (0, 0, -1)), mode=Mode.SUBTRACT)
    with BuildSketch(Plane(origin=(-9.891631825, 56.535454193, -8), x_dir=(1, 0, 0), z_dir=(0, -1, 0))) as fillet2_piece_17:
        with BuildLine():
            CenterArc((1.3 + FILLET2_R, FILLET2_R), FILLET2_R, 180, 90)
            Line((1.3, FILLET2_R), (1.3, 0))
            Line((1.3, 0), (1.3 + FILLET2_R, 0))
        make_face()
    revolve(axis=Axis((-9.891631825, 56.535454193, -8), (0, 0, 1)), mode=Mode.SUBTRACT)
    with BuildSketch(Plane(origin=(-6.228921363, 35.857336482, -8), x_dir=(1, 0, 0), z_dir=(0, -1, 0))) as fillet2_piece_18:
        with BuildLine():
            CenterArc((1.4 + FILLET2_R, FILLET2_R), FILLET2_R, 180, 90)
            Line((1.4, FILLET2_R), (1.4, 0))
            Line((1.4, 0), (1.4 + FILLET2_R, 0))
        make_face()
    revolve(axis=Axis((-6.228921363, 35.857336482, -8), (0, 0, 1)), mode=Mode.SUBTRACT)
    with BuildSketch(Plane(origin=(-6.619693657, 58.130578208, -8), x_dir=(0.17441478392024404, -0.9846722719514623, 0), z_dir=(0.9846722719514623, 0.17441478392024404, 0))) as fillet2_piece_19a_section:
        with BuildLine():
            CenterArc((FILLET2_R, -FILLET2_R), FILLET2_R, 90, 90)
            Line((0, -FILLET2_R), (0, 0))
            Line((0, 0), (FILLET2_R, 0))
        make_face()
    fillet2_piece_19a = extrude(amount=7.5, mode=Mode.PRIVATE)
    fillet2_piece_19a = fillet2_piece_19a & Plane(origin=(-6.127357521, 58.2177856, -7.771922902), x_dir=(0.17441478392008683, -0.9846722719514902, 0), z_dir=(0, 0, -1)) * Cylinder(2, 19, mode=Mode.PRIVATE)
    with BuildSketch(Plane(origin=(-6.127357521, 58.2177856, -8), x_dir=(-0.17441478392008739, 0.9846722719514901, 0), z_dir=(-0.9846722719514901, -0.17441478392008739, 0))) as fillet2_piece_19b_section:
        with BuildLine():
            CenterArc((2 - FILLET2_R, -FILLET2_R), FILLET2_R, 0, 90)
            Line((2, -FILLET2_R), (2, 0))
            Line((2, 0), (2 - FILLET2_R, 0))
        make_face()
    fillet2_piece_19b = revolve(axis=Axis((-6.127357521, 58.2177856, -8), (0, 0, -1)), revolution_arc=161.648494619, mode=Mode.PRIVATE)
    fillet2_piece_19b = split(fillet2_piece_19b, bisect_by=Plane(origin=(-4.782224034, 58.4560488, -7.758124149), z_dir=(0.1744147839202442, -0.9846722719514623, 0)), keep=Keep.TOP, mode=Mode.PRIVATE)
    fillet2_piece_19 = fillet2_piece_19a & fillet2_piece_19b
    add(fillet2_piece_19, mode=Mode.SUBTRACT)
    with BuildSketch(Plane(origin=(8.881873527, 50.883696095, -8), x_dir=(0, 0, 1), z_dir=(-0.9846722719514623, -0.17441478392024387, 0))) as fillet2_piece_20a_section:
        with BuildLine():
            CenterArc((FILLET2_R, FILLET2_R), FILLET2_R, 180, 90)
            Line((0, FILLET2_R), (0, 0))
            Line((0, 0), (FILLET2_R, 0))
        make_face()
    fillet2_piece_20a = extrude(amount=14, mode=Mode.PRIVATE)
    fillet2_piece_20a = split(fillet2_piece_20a, bisect_by=Plane(origin=(-2.481344256, 49.100851072, -7.773604886), z_dir=(-0.9846722719514623, -0.17441478392024493, 0)), keep=Keep.TOP, mode=Mode.PRIVATE)
    with BuildSketch(Plane(origin=(-0.146472947, 35.919152913, -8), x_dir=(-0.9846722719514621, -0.1744147839202449, 0), z_dir=(-0.1744147839202449, 0.9846722719514621, 0))) as fillet2_piece_20b_section:
        with BuildLine():
            CenterArc((FILLET2_R, FILLET2_R), FILLET2_R, 180, 90)
            Line((0, FILLET2_R), (0, 0))
            Line((0, 0), (FILLET2_R, 0))
        make_face()
    fillet2_piece_20b = extrude(amount=15.660493634, mode=Mode.PRIVATE)
    fillet2_piece_20b = split(fillet2_piece_20b, bisect_by=Plane(origin=(-2.664782592, 48.838439425, -7.773604886), z_dir=(-0.17441478392024387, 0.9846722719514623, 0)), keep=Keep.TOP, mode=Mode.PRIVATE)
    fillet2_piece_20 = fillet2_piece_20a & fillet2_piece_20b
    add(fillet2_piece_20, mode=Mode.SUBTRACT)
    with BuildSketch(Plane(origin=(-2.377439667, 37.047331753, -8), x_dir=(0.9846722719514622, 0.17441478392024493, 0), z_dir=(-0.1744147839202449, 0.9846722719514621, 0))) as fillet2_piece_21a_section:
        with BuildLine():
            CenterArc((FILLET2_R, -FILLET2_R), FILLET2_R, 90, 90)
            Line((0, -FILLET2_R), (0, 0))
            Line((0, 0), (FILLET2_R, 0))
        make_face()
    fillet2_piece_21a = extrude(amount=17.5, mode=Mode.PRIVATE)
    fillet2_piece_21a = split(fillet2_piece_21a, bisect_by=Plane(origin=(-2.590551635, 39.548499088, -7.773604886), z_dir=(0.17441478392024487, -0.9846722719514623, 0)), keep=Keep.TOP, mode=Mode.PRIVATE)
    with BuildSketch(Plane(origin=(-0.351795947, 39.945049393, -8), x_dir=(0.17441478392024484, -0.9846722719514622, 0), z_dir=(-0.9846722719514623, -0.17441478392024487, 0))) as fillet2_piece_21b_section:
        with BuildLine():
            CenterArc((FILLET2_R, FILLET2_R), FILLET2_R, 180, 90)
            Line((0, FILLET2_R), (0, 0))
            Line((0, 0), (FILLET2_R, 0))
        make_face()
    fillet2_piece_21b = extrude(amount=13, mode=Mode.PRIVATE)
    fillet2_piece_21b = split(fillet2_piece_21b, bisect_by=Plane(origin=(-2.773989972, 39.286087442, -7.773604886), z_dir=(0.9846722719514623, 0.17441478392024493, 0)), keep=Keep.TOP, mode=Mode.PRIVATE)
    fillet2_piece_21 = fillet2_piece_21a & fillet2_piece_21b
    add(fillet2_piece_21, mode=Mode.SUBTRACT)
    with BuildSketch(Plane(origin=(-2.968017706, 54.715133472, -8), x_dir=(-0.17441478392024484, 0.9846722719514622, 0), z_dir=(-0.9846722719514623, -0.17441478392024487, 0))) as fillet2_piece_22a_section:
        with BuildLine():
            CenterArc((FILLET2_R, -FILLET2_R), FILLET2_R, 90, 90)
            Line((0, -FILLET2_R), (0, 0))
            Line((0, 0), (FILLET2_R, 0))
        make_face()
    fillet2_piece_22a = extrude(amount=13, mode=Mode.PRIVATE)
    fillet2_piece_22a = split(fillet2_piece_22a, bisect_by=Plane(origin=(-5.46918504, 54.502021504, -7.773604886), z_dir=(0.9846722719514623, 0.17441478392024493, 0)), keep=Keep.TOP, mode=Mode.PRIVATE)
    with BuildSketch(Plane(origin=(-2.813476627, 39.509012433, -8), x_dir=(0.9846722719514622, 0.17441478392024493, 0), z_dir=(-0.1744147839202449, 0.9846722719514621, 0))) as fillet2_piece_22b_section:
        with BuildLine():
            CenterArc((FILLET2_R, -FILLET2_R), FILLET2_R, 90, 90)
            Line((0, -FILLET2_R), (0, 0))
            Line((0, 0), (FILLET2_R, 0))
        make_face()
    fillet2_piece_22b = extrude(amount=17.5, mode=Mode.PRIVATE)
    fillet2_piece_22b = split(fillet2_piece_22b, bisect_by=Plane(origin=(-5.206773394, 54.318583167, -7.773604886), z_dir=(-0.17441478392024487, 0.9846722719514623, 0)), keep=Keep.TOP, mode=Mode.PRIVATE)
    fillet2_piece_22 = fillet2_piece_22a & fillet2_piece_22b
    add(fillet2_piece_22, mode=Mode.SUBTRACT)


solid = Compound([part.part, body_2.part])
